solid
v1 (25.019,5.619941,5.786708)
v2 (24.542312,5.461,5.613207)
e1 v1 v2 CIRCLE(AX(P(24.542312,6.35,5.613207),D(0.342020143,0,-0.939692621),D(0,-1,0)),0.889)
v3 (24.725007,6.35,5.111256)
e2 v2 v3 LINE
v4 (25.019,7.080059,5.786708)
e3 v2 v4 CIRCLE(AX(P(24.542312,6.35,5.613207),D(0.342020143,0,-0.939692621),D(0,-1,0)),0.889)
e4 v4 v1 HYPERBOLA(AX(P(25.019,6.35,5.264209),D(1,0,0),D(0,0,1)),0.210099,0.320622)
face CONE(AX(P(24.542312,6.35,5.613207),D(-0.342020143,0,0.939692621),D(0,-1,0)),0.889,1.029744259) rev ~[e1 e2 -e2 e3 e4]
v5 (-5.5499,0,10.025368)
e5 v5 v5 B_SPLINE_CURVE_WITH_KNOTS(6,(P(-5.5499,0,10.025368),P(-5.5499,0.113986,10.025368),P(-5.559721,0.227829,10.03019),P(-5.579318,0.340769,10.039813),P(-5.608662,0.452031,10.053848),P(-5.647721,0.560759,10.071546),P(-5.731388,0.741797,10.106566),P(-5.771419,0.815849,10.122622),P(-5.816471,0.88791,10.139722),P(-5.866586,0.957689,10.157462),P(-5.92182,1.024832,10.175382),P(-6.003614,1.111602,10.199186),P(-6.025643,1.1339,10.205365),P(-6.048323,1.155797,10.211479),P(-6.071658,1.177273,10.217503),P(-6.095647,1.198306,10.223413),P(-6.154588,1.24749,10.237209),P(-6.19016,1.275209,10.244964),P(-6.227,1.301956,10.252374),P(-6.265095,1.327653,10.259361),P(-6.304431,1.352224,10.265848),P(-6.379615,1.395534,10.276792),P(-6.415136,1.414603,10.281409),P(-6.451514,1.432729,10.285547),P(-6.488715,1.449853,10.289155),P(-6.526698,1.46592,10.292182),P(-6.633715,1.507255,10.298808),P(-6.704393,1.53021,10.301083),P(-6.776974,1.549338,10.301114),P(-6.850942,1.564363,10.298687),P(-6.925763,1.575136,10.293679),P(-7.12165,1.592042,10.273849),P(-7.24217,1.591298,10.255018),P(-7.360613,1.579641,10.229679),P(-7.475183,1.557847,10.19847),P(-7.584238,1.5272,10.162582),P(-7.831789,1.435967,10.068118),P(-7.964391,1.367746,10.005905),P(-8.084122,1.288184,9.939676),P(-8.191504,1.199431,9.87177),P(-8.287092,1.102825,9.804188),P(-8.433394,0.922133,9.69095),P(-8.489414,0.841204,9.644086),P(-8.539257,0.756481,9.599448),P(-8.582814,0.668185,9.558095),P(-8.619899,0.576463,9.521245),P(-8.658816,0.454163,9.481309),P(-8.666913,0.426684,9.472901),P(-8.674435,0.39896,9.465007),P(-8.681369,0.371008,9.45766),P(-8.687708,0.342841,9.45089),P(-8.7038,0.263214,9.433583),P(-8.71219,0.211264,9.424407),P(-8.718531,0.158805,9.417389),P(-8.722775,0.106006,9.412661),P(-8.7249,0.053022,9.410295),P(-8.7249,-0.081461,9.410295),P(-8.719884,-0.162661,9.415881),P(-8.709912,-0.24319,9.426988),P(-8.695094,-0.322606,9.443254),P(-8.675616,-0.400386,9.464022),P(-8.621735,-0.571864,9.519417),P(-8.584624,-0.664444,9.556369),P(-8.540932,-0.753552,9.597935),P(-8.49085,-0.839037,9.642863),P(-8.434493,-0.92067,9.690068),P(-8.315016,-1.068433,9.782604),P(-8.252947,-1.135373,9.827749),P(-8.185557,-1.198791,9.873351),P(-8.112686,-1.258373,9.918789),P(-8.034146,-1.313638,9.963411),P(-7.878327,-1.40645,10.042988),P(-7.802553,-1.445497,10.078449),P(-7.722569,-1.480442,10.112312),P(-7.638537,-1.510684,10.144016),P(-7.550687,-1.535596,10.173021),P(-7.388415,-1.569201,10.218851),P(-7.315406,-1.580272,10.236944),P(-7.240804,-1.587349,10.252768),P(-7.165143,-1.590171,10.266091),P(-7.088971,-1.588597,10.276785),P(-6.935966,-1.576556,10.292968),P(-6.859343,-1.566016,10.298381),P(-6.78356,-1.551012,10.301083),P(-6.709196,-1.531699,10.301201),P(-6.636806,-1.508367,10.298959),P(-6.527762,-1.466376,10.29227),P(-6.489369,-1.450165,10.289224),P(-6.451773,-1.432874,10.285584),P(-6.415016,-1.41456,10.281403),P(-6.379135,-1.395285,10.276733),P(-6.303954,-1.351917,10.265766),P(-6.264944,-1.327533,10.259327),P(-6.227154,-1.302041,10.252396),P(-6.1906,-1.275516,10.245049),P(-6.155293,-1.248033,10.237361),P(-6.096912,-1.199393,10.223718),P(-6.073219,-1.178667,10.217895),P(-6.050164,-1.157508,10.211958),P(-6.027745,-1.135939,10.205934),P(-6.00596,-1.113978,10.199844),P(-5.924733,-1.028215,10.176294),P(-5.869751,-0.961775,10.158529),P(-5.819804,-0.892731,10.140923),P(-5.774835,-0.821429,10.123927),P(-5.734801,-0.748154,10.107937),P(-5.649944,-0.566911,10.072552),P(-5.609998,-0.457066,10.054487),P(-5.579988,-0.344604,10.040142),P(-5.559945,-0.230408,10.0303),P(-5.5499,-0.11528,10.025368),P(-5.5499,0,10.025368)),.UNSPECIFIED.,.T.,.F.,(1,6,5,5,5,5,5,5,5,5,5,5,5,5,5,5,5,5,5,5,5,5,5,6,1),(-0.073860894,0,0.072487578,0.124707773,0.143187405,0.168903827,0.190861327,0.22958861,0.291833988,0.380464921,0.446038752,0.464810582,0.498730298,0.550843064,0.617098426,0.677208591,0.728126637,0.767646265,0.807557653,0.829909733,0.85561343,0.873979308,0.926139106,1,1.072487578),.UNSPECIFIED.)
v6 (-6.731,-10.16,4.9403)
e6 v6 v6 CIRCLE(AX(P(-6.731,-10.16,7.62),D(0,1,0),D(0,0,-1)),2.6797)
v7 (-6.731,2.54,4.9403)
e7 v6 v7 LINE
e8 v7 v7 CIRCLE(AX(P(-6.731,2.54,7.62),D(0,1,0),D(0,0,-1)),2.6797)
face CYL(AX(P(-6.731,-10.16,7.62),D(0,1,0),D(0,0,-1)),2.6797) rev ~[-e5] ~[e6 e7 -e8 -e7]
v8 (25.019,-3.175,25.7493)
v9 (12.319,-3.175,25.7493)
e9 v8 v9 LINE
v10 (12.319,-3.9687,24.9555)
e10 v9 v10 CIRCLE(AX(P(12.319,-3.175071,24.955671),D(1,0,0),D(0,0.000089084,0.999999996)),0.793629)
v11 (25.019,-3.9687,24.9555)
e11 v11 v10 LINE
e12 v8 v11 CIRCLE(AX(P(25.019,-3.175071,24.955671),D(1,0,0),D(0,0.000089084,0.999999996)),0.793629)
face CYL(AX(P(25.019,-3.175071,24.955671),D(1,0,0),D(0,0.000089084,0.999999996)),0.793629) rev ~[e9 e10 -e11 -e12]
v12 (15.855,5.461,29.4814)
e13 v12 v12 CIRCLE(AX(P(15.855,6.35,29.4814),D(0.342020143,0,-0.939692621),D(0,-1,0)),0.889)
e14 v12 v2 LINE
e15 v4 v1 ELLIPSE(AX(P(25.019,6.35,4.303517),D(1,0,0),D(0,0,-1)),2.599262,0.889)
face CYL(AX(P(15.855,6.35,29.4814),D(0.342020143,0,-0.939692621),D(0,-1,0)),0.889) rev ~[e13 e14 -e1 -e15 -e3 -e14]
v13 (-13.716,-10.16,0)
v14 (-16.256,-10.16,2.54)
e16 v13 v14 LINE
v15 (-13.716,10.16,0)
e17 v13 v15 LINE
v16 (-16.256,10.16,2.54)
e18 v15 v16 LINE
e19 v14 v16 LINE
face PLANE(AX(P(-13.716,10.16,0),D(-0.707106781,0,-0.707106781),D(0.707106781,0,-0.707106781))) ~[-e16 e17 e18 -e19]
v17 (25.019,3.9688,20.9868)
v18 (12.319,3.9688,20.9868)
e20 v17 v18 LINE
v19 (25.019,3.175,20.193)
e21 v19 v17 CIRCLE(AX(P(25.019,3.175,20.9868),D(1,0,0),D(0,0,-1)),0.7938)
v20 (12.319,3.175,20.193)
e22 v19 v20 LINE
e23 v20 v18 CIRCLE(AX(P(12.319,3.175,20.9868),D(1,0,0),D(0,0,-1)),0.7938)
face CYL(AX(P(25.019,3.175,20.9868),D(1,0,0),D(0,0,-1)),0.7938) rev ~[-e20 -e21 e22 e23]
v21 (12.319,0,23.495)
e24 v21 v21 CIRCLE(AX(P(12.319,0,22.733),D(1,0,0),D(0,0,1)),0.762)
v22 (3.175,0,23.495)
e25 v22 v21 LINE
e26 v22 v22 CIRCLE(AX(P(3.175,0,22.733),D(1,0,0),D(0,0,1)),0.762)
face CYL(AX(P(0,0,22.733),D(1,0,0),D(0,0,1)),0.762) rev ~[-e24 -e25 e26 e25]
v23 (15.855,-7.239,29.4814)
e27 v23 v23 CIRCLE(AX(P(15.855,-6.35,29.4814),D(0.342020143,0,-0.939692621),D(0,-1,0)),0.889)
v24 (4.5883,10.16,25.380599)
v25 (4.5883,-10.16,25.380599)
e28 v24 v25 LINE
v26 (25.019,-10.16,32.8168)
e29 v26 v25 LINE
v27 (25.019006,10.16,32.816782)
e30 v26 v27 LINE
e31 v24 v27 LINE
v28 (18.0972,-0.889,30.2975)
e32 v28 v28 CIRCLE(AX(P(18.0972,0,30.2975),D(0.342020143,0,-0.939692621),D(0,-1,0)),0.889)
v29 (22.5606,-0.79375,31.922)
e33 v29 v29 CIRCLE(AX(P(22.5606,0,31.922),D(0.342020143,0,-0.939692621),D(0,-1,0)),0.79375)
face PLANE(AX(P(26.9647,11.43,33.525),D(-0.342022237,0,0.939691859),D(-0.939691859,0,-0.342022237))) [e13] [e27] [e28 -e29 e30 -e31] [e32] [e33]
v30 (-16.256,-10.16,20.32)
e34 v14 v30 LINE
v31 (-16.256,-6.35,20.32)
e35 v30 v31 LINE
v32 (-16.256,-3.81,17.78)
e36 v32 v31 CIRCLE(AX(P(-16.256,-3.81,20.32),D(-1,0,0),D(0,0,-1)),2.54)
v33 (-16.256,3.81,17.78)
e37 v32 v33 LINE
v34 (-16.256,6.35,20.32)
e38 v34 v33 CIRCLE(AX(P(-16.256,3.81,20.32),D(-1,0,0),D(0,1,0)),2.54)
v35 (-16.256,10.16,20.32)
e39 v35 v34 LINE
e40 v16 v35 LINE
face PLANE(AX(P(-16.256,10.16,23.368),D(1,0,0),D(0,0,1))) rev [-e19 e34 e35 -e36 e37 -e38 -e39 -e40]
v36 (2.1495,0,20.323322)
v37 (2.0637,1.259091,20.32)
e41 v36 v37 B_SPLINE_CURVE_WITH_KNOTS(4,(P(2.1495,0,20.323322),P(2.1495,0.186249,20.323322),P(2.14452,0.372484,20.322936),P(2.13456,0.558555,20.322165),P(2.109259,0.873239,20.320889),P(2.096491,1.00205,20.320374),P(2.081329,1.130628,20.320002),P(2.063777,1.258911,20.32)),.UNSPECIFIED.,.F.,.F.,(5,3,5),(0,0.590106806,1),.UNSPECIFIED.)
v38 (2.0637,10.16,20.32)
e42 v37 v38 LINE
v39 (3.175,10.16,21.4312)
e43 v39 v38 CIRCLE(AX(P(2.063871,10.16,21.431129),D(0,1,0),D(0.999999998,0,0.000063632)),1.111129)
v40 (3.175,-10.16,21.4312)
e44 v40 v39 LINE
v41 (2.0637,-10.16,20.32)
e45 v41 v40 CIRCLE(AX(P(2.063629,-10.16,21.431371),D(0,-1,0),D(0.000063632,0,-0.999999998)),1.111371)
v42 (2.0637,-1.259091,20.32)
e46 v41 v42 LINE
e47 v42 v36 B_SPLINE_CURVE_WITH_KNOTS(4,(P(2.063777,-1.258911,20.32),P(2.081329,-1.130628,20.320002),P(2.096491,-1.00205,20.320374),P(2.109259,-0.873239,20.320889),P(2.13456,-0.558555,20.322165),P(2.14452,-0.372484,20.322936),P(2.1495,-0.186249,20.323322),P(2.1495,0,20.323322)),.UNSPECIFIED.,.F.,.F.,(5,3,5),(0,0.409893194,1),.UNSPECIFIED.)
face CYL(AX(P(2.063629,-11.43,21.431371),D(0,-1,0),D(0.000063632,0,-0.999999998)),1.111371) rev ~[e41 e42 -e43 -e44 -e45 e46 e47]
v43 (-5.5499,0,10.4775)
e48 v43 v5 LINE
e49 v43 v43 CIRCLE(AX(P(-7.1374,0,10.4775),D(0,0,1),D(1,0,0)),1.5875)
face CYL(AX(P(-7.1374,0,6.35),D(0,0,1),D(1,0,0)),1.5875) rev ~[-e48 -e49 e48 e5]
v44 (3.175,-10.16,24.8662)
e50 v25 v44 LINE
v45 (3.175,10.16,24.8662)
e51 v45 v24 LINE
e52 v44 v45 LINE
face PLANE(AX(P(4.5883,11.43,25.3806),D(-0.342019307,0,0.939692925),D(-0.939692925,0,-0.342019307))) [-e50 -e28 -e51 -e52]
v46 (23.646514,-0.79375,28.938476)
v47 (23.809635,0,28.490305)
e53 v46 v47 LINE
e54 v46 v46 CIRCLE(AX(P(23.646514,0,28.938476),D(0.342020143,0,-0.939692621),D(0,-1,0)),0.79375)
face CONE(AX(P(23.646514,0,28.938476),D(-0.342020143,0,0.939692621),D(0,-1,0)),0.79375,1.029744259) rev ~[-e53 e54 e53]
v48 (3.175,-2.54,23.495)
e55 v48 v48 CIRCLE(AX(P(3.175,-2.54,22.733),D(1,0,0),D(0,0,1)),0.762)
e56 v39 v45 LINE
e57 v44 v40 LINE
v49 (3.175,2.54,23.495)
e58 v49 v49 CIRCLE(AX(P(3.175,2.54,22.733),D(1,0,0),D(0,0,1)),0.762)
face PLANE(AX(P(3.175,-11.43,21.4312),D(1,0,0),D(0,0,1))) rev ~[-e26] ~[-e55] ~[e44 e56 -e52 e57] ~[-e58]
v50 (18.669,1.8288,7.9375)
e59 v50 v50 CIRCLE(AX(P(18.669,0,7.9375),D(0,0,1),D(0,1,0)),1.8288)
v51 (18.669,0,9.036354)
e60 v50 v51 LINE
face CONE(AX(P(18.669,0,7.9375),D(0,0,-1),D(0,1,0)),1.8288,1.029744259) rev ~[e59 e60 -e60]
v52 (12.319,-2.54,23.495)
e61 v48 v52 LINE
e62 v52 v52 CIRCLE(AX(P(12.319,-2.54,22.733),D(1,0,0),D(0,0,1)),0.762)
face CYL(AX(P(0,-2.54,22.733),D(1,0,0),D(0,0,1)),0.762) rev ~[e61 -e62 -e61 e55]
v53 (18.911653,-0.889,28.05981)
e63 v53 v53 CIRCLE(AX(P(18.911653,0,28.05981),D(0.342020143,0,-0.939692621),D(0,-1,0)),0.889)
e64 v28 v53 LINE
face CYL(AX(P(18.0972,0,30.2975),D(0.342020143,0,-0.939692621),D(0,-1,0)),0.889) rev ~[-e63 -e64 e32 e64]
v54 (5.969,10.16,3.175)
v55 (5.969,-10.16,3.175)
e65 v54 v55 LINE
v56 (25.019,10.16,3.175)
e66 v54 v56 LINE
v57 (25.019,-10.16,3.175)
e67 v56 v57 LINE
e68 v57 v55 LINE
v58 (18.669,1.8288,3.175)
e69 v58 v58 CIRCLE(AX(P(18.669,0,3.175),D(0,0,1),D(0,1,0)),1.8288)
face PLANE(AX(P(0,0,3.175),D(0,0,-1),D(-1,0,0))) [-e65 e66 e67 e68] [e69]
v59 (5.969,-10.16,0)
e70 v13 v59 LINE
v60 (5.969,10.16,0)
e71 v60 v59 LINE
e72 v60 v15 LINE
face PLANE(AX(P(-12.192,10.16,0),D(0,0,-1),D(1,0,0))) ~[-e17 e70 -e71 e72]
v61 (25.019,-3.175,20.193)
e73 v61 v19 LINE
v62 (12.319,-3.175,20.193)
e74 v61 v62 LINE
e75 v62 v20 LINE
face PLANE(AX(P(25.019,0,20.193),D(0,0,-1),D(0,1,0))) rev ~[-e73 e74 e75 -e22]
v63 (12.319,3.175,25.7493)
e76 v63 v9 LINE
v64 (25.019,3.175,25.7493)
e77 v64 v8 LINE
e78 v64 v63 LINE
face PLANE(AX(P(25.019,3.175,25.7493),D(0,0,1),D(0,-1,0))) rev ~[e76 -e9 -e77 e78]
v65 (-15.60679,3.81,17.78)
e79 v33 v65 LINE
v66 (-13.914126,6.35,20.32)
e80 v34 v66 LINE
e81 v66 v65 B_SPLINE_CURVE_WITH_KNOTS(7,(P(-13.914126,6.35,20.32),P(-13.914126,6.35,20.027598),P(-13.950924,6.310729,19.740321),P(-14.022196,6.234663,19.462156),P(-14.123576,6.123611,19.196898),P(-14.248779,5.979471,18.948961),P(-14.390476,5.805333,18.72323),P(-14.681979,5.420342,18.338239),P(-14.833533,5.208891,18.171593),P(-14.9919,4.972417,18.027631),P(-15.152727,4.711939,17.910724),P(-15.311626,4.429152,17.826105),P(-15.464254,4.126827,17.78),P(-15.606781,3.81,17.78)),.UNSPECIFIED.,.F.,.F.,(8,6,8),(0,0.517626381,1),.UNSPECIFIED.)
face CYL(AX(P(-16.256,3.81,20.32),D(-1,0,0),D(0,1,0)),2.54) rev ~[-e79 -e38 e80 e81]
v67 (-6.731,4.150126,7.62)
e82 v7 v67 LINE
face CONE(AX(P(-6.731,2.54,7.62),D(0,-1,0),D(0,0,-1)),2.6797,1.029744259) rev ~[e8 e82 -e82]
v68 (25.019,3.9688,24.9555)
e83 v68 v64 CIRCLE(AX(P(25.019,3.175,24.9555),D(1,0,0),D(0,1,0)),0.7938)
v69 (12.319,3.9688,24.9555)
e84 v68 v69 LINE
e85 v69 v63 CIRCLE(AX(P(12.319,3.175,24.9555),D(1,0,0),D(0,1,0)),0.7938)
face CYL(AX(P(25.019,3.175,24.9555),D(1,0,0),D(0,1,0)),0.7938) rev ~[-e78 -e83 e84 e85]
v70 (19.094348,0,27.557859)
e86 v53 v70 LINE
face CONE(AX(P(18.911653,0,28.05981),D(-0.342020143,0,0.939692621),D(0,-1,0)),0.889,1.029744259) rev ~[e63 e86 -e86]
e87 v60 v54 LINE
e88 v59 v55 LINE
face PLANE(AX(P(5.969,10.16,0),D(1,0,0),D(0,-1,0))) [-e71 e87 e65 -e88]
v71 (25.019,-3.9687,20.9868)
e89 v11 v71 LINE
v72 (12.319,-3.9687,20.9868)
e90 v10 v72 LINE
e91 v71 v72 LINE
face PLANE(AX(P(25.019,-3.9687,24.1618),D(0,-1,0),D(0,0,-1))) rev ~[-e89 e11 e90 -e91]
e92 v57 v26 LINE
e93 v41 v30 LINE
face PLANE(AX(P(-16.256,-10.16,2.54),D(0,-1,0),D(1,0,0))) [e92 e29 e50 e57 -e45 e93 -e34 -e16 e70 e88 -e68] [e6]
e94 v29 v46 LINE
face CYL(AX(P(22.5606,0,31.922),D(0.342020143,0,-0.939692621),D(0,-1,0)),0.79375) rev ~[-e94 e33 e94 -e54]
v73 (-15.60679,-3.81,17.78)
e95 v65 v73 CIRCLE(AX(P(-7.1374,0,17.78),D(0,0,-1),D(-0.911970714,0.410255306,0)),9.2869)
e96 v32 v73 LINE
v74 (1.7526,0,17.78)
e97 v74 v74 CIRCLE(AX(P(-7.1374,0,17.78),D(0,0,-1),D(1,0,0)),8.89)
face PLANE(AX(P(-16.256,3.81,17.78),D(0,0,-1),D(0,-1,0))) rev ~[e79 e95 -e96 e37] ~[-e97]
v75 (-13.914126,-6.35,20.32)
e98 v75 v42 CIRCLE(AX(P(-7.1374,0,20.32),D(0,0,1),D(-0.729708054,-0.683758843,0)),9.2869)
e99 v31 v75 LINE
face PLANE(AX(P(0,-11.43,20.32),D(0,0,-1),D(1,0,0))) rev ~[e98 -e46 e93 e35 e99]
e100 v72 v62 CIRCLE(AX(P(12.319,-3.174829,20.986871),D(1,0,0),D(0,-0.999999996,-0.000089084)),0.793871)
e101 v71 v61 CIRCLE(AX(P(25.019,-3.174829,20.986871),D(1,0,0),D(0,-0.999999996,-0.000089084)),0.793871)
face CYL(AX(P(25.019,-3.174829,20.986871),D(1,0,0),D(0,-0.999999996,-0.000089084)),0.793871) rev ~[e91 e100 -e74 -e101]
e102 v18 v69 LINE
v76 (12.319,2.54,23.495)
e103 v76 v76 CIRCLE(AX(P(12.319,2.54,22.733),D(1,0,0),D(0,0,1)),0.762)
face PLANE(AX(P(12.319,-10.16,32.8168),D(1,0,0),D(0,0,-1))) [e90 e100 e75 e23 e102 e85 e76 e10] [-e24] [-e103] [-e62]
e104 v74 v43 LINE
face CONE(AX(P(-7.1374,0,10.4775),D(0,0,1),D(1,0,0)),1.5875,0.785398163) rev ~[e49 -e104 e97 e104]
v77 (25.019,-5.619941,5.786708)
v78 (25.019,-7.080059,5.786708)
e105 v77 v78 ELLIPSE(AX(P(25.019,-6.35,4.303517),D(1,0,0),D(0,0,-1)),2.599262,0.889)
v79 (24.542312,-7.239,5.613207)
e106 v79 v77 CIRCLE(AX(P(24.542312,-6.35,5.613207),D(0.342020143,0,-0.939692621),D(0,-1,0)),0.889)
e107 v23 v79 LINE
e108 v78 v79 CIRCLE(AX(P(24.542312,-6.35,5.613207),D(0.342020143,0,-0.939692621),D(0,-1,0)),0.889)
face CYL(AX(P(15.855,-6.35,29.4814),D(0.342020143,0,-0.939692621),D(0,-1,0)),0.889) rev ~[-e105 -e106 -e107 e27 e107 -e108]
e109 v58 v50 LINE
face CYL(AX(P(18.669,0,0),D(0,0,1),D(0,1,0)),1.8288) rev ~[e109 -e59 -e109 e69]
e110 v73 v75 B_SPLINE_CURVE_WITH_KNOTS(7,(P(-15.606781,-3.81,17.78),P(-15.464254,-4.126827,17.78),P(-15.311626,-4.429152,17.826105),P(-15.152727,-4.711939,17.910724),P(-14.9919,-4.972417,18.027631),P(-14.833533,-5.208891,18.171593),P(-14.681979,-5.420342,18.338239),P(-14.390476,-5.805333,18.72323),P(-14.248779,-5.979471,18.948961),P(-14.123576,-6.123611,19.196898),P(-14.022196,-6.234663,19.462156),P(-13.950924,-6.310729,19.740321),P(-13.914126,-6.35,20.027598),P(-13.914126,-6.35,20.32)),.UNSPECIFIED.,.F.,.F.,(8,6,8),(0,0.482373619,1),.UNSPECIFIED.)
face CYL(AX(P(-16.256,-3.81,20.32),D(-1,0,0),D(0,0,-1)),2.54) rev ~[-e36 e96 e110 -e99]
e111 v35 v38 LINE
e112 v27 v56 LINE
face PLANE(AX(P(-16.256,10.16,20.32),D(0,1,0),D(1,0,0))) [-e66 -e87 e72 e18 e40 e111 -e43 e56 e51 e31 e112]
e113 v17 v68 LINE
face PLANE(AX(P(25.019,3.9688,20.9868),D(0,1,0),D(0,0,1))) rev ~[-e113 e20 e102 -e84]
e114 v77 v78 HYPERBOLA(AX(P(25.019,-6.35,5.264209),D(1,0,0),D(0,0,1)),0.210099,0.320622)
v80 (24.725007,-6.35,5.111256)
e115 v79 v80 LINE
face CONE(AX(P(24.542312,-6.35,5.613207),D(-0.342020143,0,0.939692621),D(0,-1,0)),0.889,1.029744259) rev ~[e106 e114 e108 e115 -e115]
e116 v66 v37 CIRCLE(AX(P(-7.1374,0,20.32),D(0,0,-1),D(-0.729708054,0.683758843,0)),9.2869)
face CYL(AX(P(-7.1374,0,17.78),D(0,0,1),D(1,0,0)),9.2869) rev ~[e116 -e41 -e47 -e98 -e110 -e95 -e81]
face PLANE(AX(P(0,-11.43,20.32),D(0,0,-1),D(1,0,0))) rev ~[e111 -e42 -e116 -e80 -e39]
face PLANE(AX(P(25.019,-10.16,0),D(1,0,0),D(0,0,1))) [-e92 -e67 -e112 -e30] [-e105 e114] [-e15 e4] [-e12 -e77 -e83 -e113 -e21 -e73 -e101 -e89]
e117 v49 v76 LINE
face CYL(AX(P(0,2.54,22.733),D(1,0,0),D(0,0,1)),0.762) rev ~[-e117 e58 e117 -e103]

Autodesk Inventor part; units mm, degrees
ref_plane "YZ Plane" through (0, 0, 0) normal (1, 0, 0) x (0, 1, 0)
sketch "Sketch1" plane through (0, 0, 0) normal (0, 0, 1) x (1, 0, 0)
  line L0 (0, 24.892) -> (0, -24.892) projected
  line L1 (-25.6032, 0) -> (39.8272, 0) projected
  line L2 (30.48, -17.78) -> (-16.256, -17.78)
  line L3 (-16.256, -17.78) -> (-16.256, 17.78)
  line L4 (-16.256, 17.78) -> (30.48, 17.78)
  line L5 (30.48, 17.78) -> (30.48, -17.78)
  dimension "d0" = 30.48
  dimension "d1" = 16.256
  dimension "d2" = 17.78
  dimension "d3" = 35.56
extrude "Extrusion1" add sketch "Sketch1" along normal blind 45.72
sketch "Sketch2" plane through (-16.256, -17.78, 0) normal (0, -1, 0) x (1, 0, 0)
  line L0 (46.736, 45.72) -> (0, 45.72) projected
  line L1 (0, 0) -> (0, 45.72) projected
  line L2 (46.736, 0) -> (0, 0) projected
  line L3 (16.256, 54.864) -> (16.256, -9.144) projected
  line L4 (16.256, 45.72) -> (16.256, 20.32)
  line L5 (16.256, 20.32) -> (4.064, 20.32)
  line L6 (4.064, 20.32) -> (4.064, 23.368)
  arc A0 (4.064, 23.368) -> (0, 23.368) centre (2.032, 23.368) ccw
  line L7 (0, 23.368) -> (0, 45.72)
  line L8 (0, 45.72) -> (16.256, 45.72)
  line L9 (0, 2.54) -> (2.54, 0)
  line L10 (2.54, 0) -> (0, 0)
  line L11 (0, 0) -> (0, 2.54)
  dimension "d6" = 25.4
  dimension "d7" = 2.032
  dimension "d8" = 2.032
  dimension "d9" = 3.048
  dimension "d10" = 2.54
  dimension "d11" = 2.54
  dimension "d12" = 4.064
extrude "Extrusion2" cut sketch "Sketch2" against normal through all contours L3 L5 L6 A0 L1 L0 | L9 L2 L1
sketch "Sketch3" plane through (-16.256, -17.78, 23.368) normal (-1, 0, 0) x (0, 0, 1)
  line L0 (-20.828, 35.56) -> (0, 35.56) projected
  line L1 (-20.828, 0) -> (0, 0) projected
  line L2 (-32.512, 17.78) -> (31.496, 17.78) projected
  line L3 (2.032, 35.56) -> (2.032, 0) projected
  line L4 (2.032, 35.56) -> (0, 35.56) projected
  line L5 (-23.368, 35.56) -> (-20.828, 35.56) projected
  line L6 (-20.828, 0) -> (-23.368, 0) projected
  line L7 (0, 0) -> (2.032, 0) projected
  line L8 (2.032, 0) -> (-23.368, 0)
  line L9 (-23.368, 0) -> (-23.368, 5.08)
  line L10 (-23.368, 5.08) -> (-3.048, 5.08)
  line L11 (-3.048, 5.08) -> (-3.048, 6.35)
  line L12 (-3.048, 6.35) -> (2.032, 6.35)
  line L13 (2.032, 6.35) -> (2.032, 0)
  line L14 (-20.828, 35.56) -> (0, 35.56)
  line L15 (-20.828, 35.56) -> (-23.368, 35.56)
  line L16 (0, 35.56) -> (2.032, 35.56)
  line L17 (2.032, 35.56) -> (-23.368, 35.56)
  line L18 (-23.368, 35.56) -> (-23.368, 30.48)
  line L19 (-23.368, 30.48) -> (-3.048, 30.48)
  line L20 (-3.048, 30.48) -> (-3.048, 29.21)
  line L21 (-3.048, 29.21) -> (2.032, 29.21)
  line L22 (2.032, 29.21) -> (2.032, 35.56)
  dimension "d15" = 6.35
  dimension "d16" = 5.08
  dimension "d17" = 5.08
extrude "Extrusion3" cut sketch "Sketch3" against normal up to surface (16.256 mm away)
sketch "Sketch4" plane through (-16.256, -12.7, 2.54) normal (-1, 0, 0) x (0, 0, 1)
  line L0 (-11.684, 12.7) -> (52.324, 12.7) projected
  line L1 (22.86, 24.13) -> (22.86, 1.27) projected
  line L2 (22.86, 12.7) -> (22.86, 6.35)
  line L3 (17.78, 6.35) -> (22.86, 6.35)
  line L4 (15.24, 8.89) -> (15.24, 12.7)
  line L5 (15.24, 12.7) -> (22.86, 12.7)
  arc A0 (15.24, 8.89) -> (17.78, 6.35) centre (17.78, 8.89) ccw
  line L6 (22.86, 12.7) -> (22.86, 19.05)
  line L7 (17.78, 19.05) -> (22.86, 19.05)
  line L8 (15.24, 16.51) -> (15.24, 12.7)
  arc A1 (17.78, 19.05) -> (15.24, 16.51) centre (17.78, 16.51) ccw
  dimension "d20" = 2.54
  dimension "d21" = 6.35
  dimension "d22" = 7.62
extrude "Extrusion4" cut sketch "Sketch4" against normal blind 7.874
sketch "Sketch11" plane through (0, -17.78, 0) normal (-1, 0, 0) x (0, 0, 1)
  line L0 (20.32, 5.08) -> (20.32, 30.48) projected
  line L1 (45.72, 35.56) -> (45.72, 0) projected
  line L2 (-9.144, 17.78) -> (54.864, 17.78) projected
  line L3 (20.32, 25.4) -> (20.32, 10.16) projected
  point P0 (20.32, 24.3791)
  point P1 (20.32, 11.1809)
  point P2 (43.18, 16.51)
  point P3 (43.18, 19.05)
  point P4 (23.368, 17.78)
  point P5 (22.733, 17.78)
  dimension "d73" = 1.27
  dimension "d74" = 1.27
  dimension "d75" = 2.54
  dimension "d76" = 2.54
  dimension "d78" = 0.635
  dimension "d476" = 2.413
hole "Hole3" at (0, 0, 22.733) direction (1, 0, 0) diameter 1.524 end through all
sketch "Sketch21" plane through (0, 0, 0) normal (0, 1, 0) x (-1, 0, 0)
  line L0 (0, -4.064) -> (0, 24.384) projected
  line L1 (13.716, 0) -> (0, 0) projected
  line L2 (16.256, 20.32) -> (16.256, 2.54) projected
  line L3 (4.3942, 0) -> (7.1374, 0)
  line L4 (4.3942, 0) -> (4.3942, 6.35)
  line L5 (4.3942, 6.35) -> (5.5499, 6.35)
  line L6 (5.5499, 6.35) -> (5.5499, 10.4775)
  line L7 (0, 20.32) -> (16.256, 20.32) projected
  line L8 (7.1374, 0) -> (7.1374, 20.32)
  line L9 (5.5499, 10.4775) -> (-1.7526, 17.78)
  line L10 (-1.7526, 17.78) -> (-1.7526, 20.32)
  line L11 (-1.7526, 20.32) -> (7.1374, 20.32)
  line L12 (-1.7526, 17.78) -> (-2.1495, 17.78)
  line L13 (-2.1495, 17.78) -> (-2.1495, 20.32)
  line L14 (-2.1495, 20.32) -> (-1.7526, 20.32)
  line L15 (-1.7526, 20.32) -> (-1.7526, 17.78)
  line L16 (5.5499, 8.4138) -> (7.1374, 8.4138)
  dimension "d159" = 7.1374
  dimension "d160" = 8.89
  dimension "d162" = 45
  dimension "d163" = 1.5875
  dimension "d292" = 0.3969
  dimension "d322" = 2.54
revolve "Revolution5" cut sketch "Sketch21" angle 360 about axis through (-7.1374, 0, 0) along (0, 0, 1) contours L9 L10 L11 L0 | L0 L7 L8 L16 L6 L9 | L4 L5 L6 L16 L8 L1 | L12 L13 L14 L10
sketch "Sketch23" plane through (0, 0, 0) normal (0, 0, -1) x (-1, 0, 0)
  line L0 (13.716, 12.7) -> (0, 12.7) projected
  line L1 (0, 17.78) -> (-30.48, 17.78) projected
  line L2 (-39.8272, 0) -> (25.6032, 0) projected
  line L3 (16.256, 12.7) -> (16.256, -12.7) projected
  line L4 (0, -12.7) -> (13.716, -12.7) projected
  line L5 (-30.48, -17.78) -> (0, -17.78) projected
  line L6 (8.382, -12.7) -> (8.382, -11.43)
  line L7 (-30.48, 17.78) -> (-30.48, -17.78) projected
  line L8 (8.382, -11.43) -> (-30.48, -11.43)
  line L9 (-30.48, -11.43) -> (-30.48, -17.78)
  line L10 (-30.48, -17.78) -> (8.382, -17.78)
  line L11 (8.382, -17.78) -> (8.382, -12.7)
  dimension "d193" = 7.874
  dimension "d231" = 6.35
extrude "Extrusion12" cut sketch "Sketch23" against normal blind 27.94
mirror "Mirror5" about plane through (0, 0, 0) normal (0, 1, 0) of "Extrusion12"
sketch "Sketch32" plane through (0, 17.78, 45.72) normal (0, 1, 0) x (1, 0, 0)
  line L0 (30.48, 17.78) -> (0, 17.78) projected
  line L1 (0, 17.78) -> (0, 0) projected
  line L2 (0, 0) -> (30.48, 0) projected
  line L3 (30.48, 17.78) -> (30.48, 0) projected
extrude "Extrusion16" cut sketch "Sketch32" against normal up to surface (6.35 mm away)
sketch "Sketch33" plane through (0, -17.78, 45.72) normal (0, -1, 0) x (1, 0, 0)
  circle A0 centre (3.1266, -12.4245) radius 0.7366 projected
  line L0 (0, -17.78) -> (30.48, -17.78) projected
  line L1 (30.48, -17.78) -> (30.48, 0) projected
  line L2 (30.48, 0) -> (0, 0) projected
  line L3 (0, 0) -> (0, -17.78) projected
extrude "Extrusion17" cut sketch "Sketch33" against normal up to surface (6.35 mm away)
sketch "Sketch34" plane through (0, 11.43, 45.72) normal (0, 1, 0) x (1, 0, 0)
  line L0 (0, 0) -> (0, 25.4) projected
  line L1 (30.48, 0) -> (0, 0) projected
  line L2 (30.48, 45.72) -> (30.48, 0) projected
  line L3 (26.9647, 12.195) -> (4.5883, 20.3394) projected
  line L4 (26.9647, 12.195) -> (30.48, 10.9156)
  line L5 (4.5883, 20.3394) -> (0, 22.0094)
  point P0 (0, 24.13)
extrude "Extrusion18" cut sketch "Sketch34" along normal through all both and the other way through all
sketch "Sketch35" plane through (-8.382, -11.43, 0) normal (0, -1, 0) x (1, 0, 0)
  line L0 (38.862, 34.8044) -> (8.382, 23.7106) projected
  line L1 (8.382, 20.32) -> (8.382, 23.7106) projected
  line L2 (38.862, 34.8044) -> (38.862, 0) projected
  line L3 (8.382, 20.32) -> (10.4457, 20.32)
  line L4 (11.557, 21.4312) -> (11.557, 24.8662)
  arc A0 (10.4457, 20.32) -> (11.557, 21.4312) centre (10.4457, 21.4312) ccw
  dimension "d284" = 1.1113
  dimension "d285" = 3.175
extrude "Extrusion19" cut sketch "Sketch35" against normal through all
sketch "Sketch38" plane through (0, 0, 0) normal (0, 0, -1) x (-1, 0, 0)
  line L0 (8.382, 11.43) -> (17.907, 11.43)
  line L1 (17.907, 11.43) -> (17.907, 14.605)
  line L2 (17.907, 14.605) -> (8.382, 14.605)
  line L3 (8.382, -11.43) -> (17.907, -11.43)
  line L4 (17.907, -11.43) -> (17.907, -14.605)
  line L5 (17.907, -14.605) -> (8.382, -14.605)
  line L6 (13.716, 12.7) -> (8.382, 12.7) projected
  line L7 (8.382, 11.43) -> (8.382, 14.605)
  line L8 (8.382, -11.43) -> (8.382, -14.605)
  dimension "d293" = 3.175
  dimension "d294" = 3.175
  dimension "d295" = 9.525
extrude "Extrusion22" cut sketch "Sketch38" against normal through all
sketch "Sketch39" plane through (-16.256, -11.43, 2.54) normal (0, -1, 0) x (1, 0, 0)
  line L0 (4.064, 17.78) -> (18.3197, 17.78) projected
  line L1 (4.064, 20.828) -> (4.064, 17.78) projected
  arc A0 (4.064, 20.828) -> (0, 20.828) centre (2.032, 20.828) ccw projected
  line L2 (0, 0) -> (0, 20.828) projected
  line L3 (2.54, -2.54) -> (0, 0) projected
  line L4 (46.736, -2.54) -> (2.54, -2.54) projected
  line L5 (46.736, 32.2644) -> (46.736, -2.54) projected
  line L6 (46.736, 32.2644) -> (19.431, 22.3262) projected
  line L7 (19.431, 22.3262) -> (19.431, 18.8912) projected
  arc A1 (18.3197, 17.78) -> (19.431, 18.8912) centre (18.3197, 18.8912) ccw projected
  line L8 (4.4328, 17.78) -> (0, 17.78)
extrude "Extrusion23" cut sketch "Sketch39" against normal through all contours L8 L2 A0 L1
sketch "Sketch45" plane through (-16.256, -11.43, 2.54) normal (0, -1, 0) x (1, 0, 0)
  line L0 (0, 17.78) -> (18.3197, 17.78) projected
  line L1 (0, 0) -> (0, 17.78) projected
  line L2 (2.54, -2.54) -> (0, 0) projected
  line L3 (46.736, -2.54) -> (2.54, -2.54) projected
  line L4 (46.736, 32.2644) -> (46.736, -2.54) projected
  line L5 (46.736, 32.2644) -> (19.431, 22.3262) projected
  line L6 (19.431, 22.3262) -> (19.431, 18.8912) projected
  arc A0 (18.3197, 17.78) -> (19.431, 18.8912) centre (18.3197, 18.8912) ccw projected
  circle A1 centre (2.3813, 7.62) radius 1.1906 projected
extrude "Extrusion29" cut sketch "Sketch45" against normal blind 1.27 contours L0 A0 L6 L5 L4 L3 L2 L1 | A1
sketch "Sketch46" plane through (-16.256, 11.43, 20.32) normal (0, 1, 0) x (1, 0, 0)
  line L0 (0, 0) -> (18.3197, 0) projected
  arc A0 (19.431, -1.1112) -> (18.3197, 0) centre (18.3197, -1.1112) ccw projected
  line L1 (19.431, -1.1112) -> (19.431, -4.5462) projected
  line L2 (19.431, -4.5462) -> (46.736, -14.4844) projected
  line L3 (46.736, 20.32) -> (46.736, -14.4844) projected
  line L4 (2.54, 20.32) -> (46.736, 20.32) projected
  line L5 (0, 17.78) -> (2.54, 20.32) projected
  line L6 (0, 0) -> (0, 17.78) projected
  circle A1 centre (2.3813, 10.16) radius 1.1906 projected
extrude "Extrusion30" cut sketch "Sketch46" against normal blind 1.27 contours L6 L5 L4 L3 L2 L1 A0 L0 | A1
sketch "Sketch47" plane through (-16.256, -10.16, 2.54) normal (0, -1, 0) x (1, 0, 0)
  line L0 (0, 0) -> (0, 17.78) projected
  line L1 (46.736, -2.54) -> (2.54, -2.54) projected
  line L2 (46.736, 32.2644) -> (46.736, -2.54) projected
  line L3 (19.431, 22.3262) -> (46.736, 32.2644) projected
  line L4 (0, 17.78) -> (18.3197, 17.78) projected
  line L5 (41.275, -2.54) -> (41.275, 30.2768)
  dimension "d327" = 41.275
extrude "Extrusion31" cut sketch "Sketch47" against normal through all
sketch "Sketch49" plane through (0, 0, 0) normal (0, 0, -1) x (-1, 0, 0)
  circle A0 centre (-18.669, 0) radius 2.0574 projected
  line L0 (-5.969, -18.288) -> (-5.969, 13.462) projected
  line L1 (-31.369, -18.288) -> (-5.969, -18.288) projected
  line L2 (-31.369, -18.288) -> (-31.369, 13.462) projected
  line L3 (-31.369, 13.462) -> (-5.969, 13.462) projected
hole "Hole11" at (18.669, 0, 0) direction (0, 0, 1) diameter 3.6576 depth 7.9375 tip angle 118 clearance for "Flat Head Machine Screw (82)" size "#6" standard "Ansi Unified Screw Threads"
sketch "Sketch50" plane through (0, 0, 0) normal (0, 0, -1) x (-1, 0, 0)
  circle A0 centre (-18.669, 0) radius 1.8288 projected
  line L0 (13.716, 10.16) -> (-25.019, 10.16) projected
  line L1 (-25.019, 10.16) -> (-25.019, -10.16) projected
  line L2 (-25.019, -10.16) -> (13.716, -10.16) projected
  line L3 (-5.969, 10.16) -> (-5.969, -10.16)
  point P0 (-5.969, -10.16)
  point P1 (-5.969, 10.16)
  dimension "d340" = 19.05
extrude "Extrusion33" cut sketch "Sketch50" against normal blind 3.175
sketch "Sketch51" plane through (25.019, -10.16, 32.8168) normal (1, 0, 0) x (0, 0, -1)
  circle A0 centre (10.0838, 10.16) radius 0.762 projected
  circle A1 centre (9.4488, 10.16) radius 0.508 projected
  line L0 (8.655, 8.5725) -> (11.0363, 8.5725)
  line L1 (11.0363, 8.5725) -> (11.0363, 11.7475)
  line L2 (11.0363, 11.7475) -> (8.655, 11.7475)
  line L3 (8.655, 11.7475) -> (8.655, 8.5725)
  circle A2 centre (8.655, 10.16) radius 1.5875
  circle A3 centre (11.0363, 10.16) radius 1.5875
  line L4 (-6.5634, 10.16) -> (39.3801, 10.16) projected
  line L5 (7.8613, 6.1913) -> (11.83, 6.1913)
  line L6 (12.6238, 6.985) -> (12.6238, 13.335)
  line L7 (11.83, 14.1288) -> (7.8613, 14.1288)
  line L8 (7.0675, 13.335) -> (7.0675, 6.985)
  arc A4 (7.0675, 7.7788) -> (8.655, 6.1913) centre (8.655, 7.7788) ccw
  arc A5 (12.6238, 13.335) -> (11.83, 14.1288) centre (11.83, 13.335) ccw
  arc A6 (11.83, 6.1913) -> (12.6238, 6.985) centre (11.83, 6.985) ccw
  arc A7 (7.8613, 14.1288) -> (7.0675, 13.335) centre (7.8613, 13.335) ccw
  arc A8 (7.0675, 6.985) -> (7.8613, 6.1913) centre (7.8613, 6.985) ccw
  dimension "d344" = 3.175
  dimension "d345" = 0
  dimension "d347" = 2.3813
  dimension "d352" = 0.9525
  dimension "d412" = 7.9375
  dimension "d413" = 3.9688
  dimension "d414" = 1.5875
  dimension "d415" = 0.7937
extrude "Extrusion34" cut sketch "Sketch51" against normal blind 12.7
sketch "Sketch53" plane through (-16.256, -10.16, 2.54) normal (0, -1, 0) x (1, 0, 0)
  line L0 (0, 17.78) -> (18.3197, 17.78) projected
  line L1 (0, 17.78) -> (4.064, 17.78)
  line L2 (4.064, 17.78) -> (4.064, 20.828)
  line L3 (4.064, 20.828) -> (0, 20.828)
  line L4 (0, 20.828) -> (0, 17.78)
  circle A0 centre (2.032, 20.828) radius 2.032
  dimension "d353" = 4.064
  dimension "d354" = 3.048
extrude "Extrusion36" add sketch "Sketch53" against normal blind 3.81
sketch "Sketch54" plane through (-16.256, -10.16, 2.54) normal (0, -1, 0) x (1, 0, 0)
  line L0 (4.064, 17.78) -> (4.064, 20.828) projected
  arc A0 (4.064, 20.828) -> (0, 20.828) centre (2.032, 20.828) ccw projected
  line L1 (0, 20.828) -> (0, 0) projected
  line L2 (2.54, -2.54) -> (0, 0) projected
  line L3 (22.225, -2.54) -> (2.54, -2.54) projected
  line L4 (4.064, 17.78) -> (4.064, -2.54)
extrude "Extrusion37" add sketch "Sketch54" along normal blind 3.175
sketch "Sketch55" plane through (-16.256, -13.335, 2.54) normal (0, -1, 0) x (1, 0, 0)
  arc A0 (4.064, 20.828) -> (0, 20.828) centre (2.032, 20.828) ccw projected
  point P0 (2.032, 20.828)
hole "Hole12" at (-14.224, -13.335, 23.368) direction (0, 1, 0) diameter 1.1906 depth 9.525 counterbore diameter 3.048 counterbore depth 5.334
sketch "Sketch56" plane through (2.0637, 1.2589, 20.32) normal (0, 0, 1) x (1, 0, 0)
  arc A0 (0, 0) -> (0, -2.5178) centre (-9.2011, -1.2589) ccw projected
  circle A1 centre (-9.2011, -1.2589) radius 9.2869
  point P0 (-14.2557, 6.5319)
extrude "Extrusion38" cut sketch "Sketch56" along normal blind 25.4
sketch "Sketch60" plane through (-16.256, -13.335, 2.54) normal (0, -1, 0) x (1, 0, 0)
  circle A0 centre (2.032, 20.828) radius 1.524 projected
  line L0 (4.064, 20.828) -> (4.064, -2.54) projected
  arc A1 (4.064, 20.828) -> (0, 20.828) centre (2.032, 20.828) ccw projected
  line L1 (0, 0) -> (0, 20.828) projected
  line L2 (0, 17.653) -> (4.064, 17.653)
  dimension "d378" = 3.175
extrude "Extrusion41" cut sketch "Sketch60" against normal blind 1.27
sketch "Sketch62" plane through (-16.256, -13.335, 2.54) normal (0, -1, 0) x (1, 0, 0)
  line L0 (4.064, 11.303) -> (0, 11.303) projected
  line L1 (0, 0) -> (0, 17.653) projected
  line L2 (2.54, -2.54) -> (0, 0) projected
  line L3 (4.064, -2.54) -> (2.54, -2.54) projected
  line L4 (4.064, 17.653) -> (4.064, -2.54) projected
extrude "Extrusion43" cut sketch "Sketch62" against normal up to surface (3.175 mm away)
fillet "Fillet2" radius 0.4001 1 edges at (-14.224, -12.065, 20.193)
ref_plane "Work Plane10" through (-16.256, -14.605, 2.54) normal (0, -1, 0) x (1, 0, 0)
sketch "Sketch63" plane through (-16.256, -14.605, 2.54) normal (0, -1, 0) x (1, 0, 0)
  line L0 (0, 17.653) -> (4.064, 17.653) projected
  line L1 (0, 11.303) -> (0, 17.653) projected
  point P0 (2.032, 14.478)
  dimension "d387" = 3.175
  dimension "d388" = 2.032
hole "Hole13" at (-14.224, -14.605, 17.018) direction (0, 1, 0) diameter 2.159 depth 3.175 tip angle 118
mirror "Mirror8" about plane through (0, 0, 0) normal (0, 1, 0) of "Hole12", "Extrusion38", "Extrusion37", "Extrusion36", "Extrusion41", "Extrusion43", "Fillet2", "Hole13"
pattern_linear "Rectangular Pattern1" count 2 spacing 2.54 along (0, 1, 0) of "Hole3"
pattern_linear "Rectangular Pattern2" count 2 spacing 2.54 along (0, -1, 0) of "Hole3"
sketch "Sketch65" plane through (-16.256, -3.81, 17.78) normal (-1, 0, 0) x (0, 0, 1)
  line L0 (-3.937, 13.97) -> (8.3591, 13.97)
  line L1 (8.3591, 13.97) -> (8.3591, 19.1782)
  line L2 (8.3591, 19.1782) -> (-3.937, 19.1782)
  line L3 (-3.937, 19.1782) -> (-3.937, 13.97)
  line L4 (-4.3371, -6.35) -> (8.3591, -6.35)
  line L5 (8.3591, -6.35) -> (8.3591, -11.3681)
  line L6 (8.3591, -11.3681) -> (-4.3371, -11.3681)
  line L7 (-4.3371, -11.3681) -> (-4.3371, -6.35)
  line L8 (8.3591, 19.1782) -> (2.54, 19.1782)
  line L9 (2.54, 19.1782) -> (2.54, 10.16)
  line L10 (2.54, 10.16) -> (8.3591, 10.16)
  line L11 (8.3591, 10.16) -> (8.3591, 19.1782)
  line L12 (8.3591, -11.3681) -> (2.54, -11.3681)
  line L13 (2.54, -11.3681) -> (2.54, -2.54)
  line L14 (2.54, -2.54) -> (8.3591, -2.54)
  line L15 (8.3591, -2.54) -> (8.3591, -11.3681)
extrude "Extrusion44" cut sketch "Sketch65" against normal up to surface (4.064 mm away)
ref_plane "Work Plane6" through (-7.1374, 0, 10.4775) normal (0, -1, 0) x (0, 0, -1)
sketch "Sketch68" plane through (-16.256, -3.81, 17.78) normal (0, 0, 1) x (1, 0, 0)
  line L0 (0, 7.62) -> (0.6492, 7.62) projected
  line L1 (0, 0) -> (0, 7.62) projected
  line L2 (0, 0) -> (0.6492, 0) projected
  arc A0 (0.6492, 0) -> (0.6492, 7.62) centre (9.1186, 3.81) ccw projected
extrude "Extrusion47" cut sketch "Sketch68" along normal blind 25.4
sketch "Sketch71" plane through (3.175, -10.16, 24.8662) normal (-0.3420201, 0, 0.9396926) x (0.9396926, 0, 0.3420201)
  circle A0 centre (13.4938, 16.51) radius 1.2192
  circle A1 centre (13.4938, 3.81) radius 1.2192
  point P0 (-11.4883, 10.16)
hole "Hole14" at (15.855, -6.35, 29.4814) at (15.855, 6.35, 29.4814) direction (0.3420201, 0, -0.9396926) diameter 1.778 depth 25.4 tip angle 118 clearance for "Flat Head Machine Screw (82)" size "#0" standard "Ansi Unified Screw Threads"
sketch "Sketch77" plane through (3.175, -10.16, 24.8662) normal (-0.3420201, 0, 0.9396926) x (0.9396926, 0, 0.3420201)
  line L0 (33.2479, 10.16) -> (-36.7659, 10.16) projected
  line L1 (23.2459, 0) -> (23.2459, 20.32) projected
  point P0 (-11.4883, 10.16)
  point P1 (20.6297, 10.16)
  dimension "d460" = 2.6162
hole "Hole15" at (22.5606, 0, 31.922) direction (0.3420201, 0, -0.9396926) diameter 1.5875 depth 3.175 tip angle 118
sketch "Sketch78" plane through (3.175, -10.16, 24.8662) normal (-0.3420201, 0, 0.9396926) x (0.9396926, 0, 0.3420201)
  line L0 (33.2479, 10.16) -> (-36.7659, 10.16) projected
  line L1 (23.2459, 0) -> (23.2459, 20.32) projected
  point P0 (-11.4883, 10.16)
  point P1 (15.8799, 10.16)
  dimension "d468" = 7.366
hole "Hole16" at (18.0972, 0, 30.2975) direction (0.3420201, 0, -0.9396926) diameter 1.778 depth 2.3813 tip angle 118 clearance for "Flat Head Machine Screw (82)" size "#0" standard "Ansi Unified Screw Threads"
sketch "Sketch80" plane through (0, 0, 0) normal (0, 0, -1) x (-1, 0, 0)
  circle A0 centre (7.1374, 0) radius 2.9281
  point P0 (0, 0)
extrude "Extrusion50" add sketch "Sketch80" against normal blind 6.35
sketch "Sketch81" plane through (-16.256, -10.16, 2.54) normal (0, -1, 0) x (1, 0, 0)
  line L0 (0, 17.78) -> (18.3197, 17.78) projected
  line L1 (0, 0) -> (0, 17.78) projected
  point P0 (16.256, -2.54)
  point P1 (9.525, 5.08)
  dimension "d486" = 12.7
  dimension "d487" = 9.525
hole "Hole17" at (-6.731, -10.16, 7.62) direction (0, 1, 0) diameter 5.3594 depth 12.7 tip angle 118 thread size "1/4-28 UNF" class "2B" standard "ANSI Unified Screw Threads"
equation "\"d2\" = 0.5 * d3"
properties part number "OdorBase_SideVacuumPort"
